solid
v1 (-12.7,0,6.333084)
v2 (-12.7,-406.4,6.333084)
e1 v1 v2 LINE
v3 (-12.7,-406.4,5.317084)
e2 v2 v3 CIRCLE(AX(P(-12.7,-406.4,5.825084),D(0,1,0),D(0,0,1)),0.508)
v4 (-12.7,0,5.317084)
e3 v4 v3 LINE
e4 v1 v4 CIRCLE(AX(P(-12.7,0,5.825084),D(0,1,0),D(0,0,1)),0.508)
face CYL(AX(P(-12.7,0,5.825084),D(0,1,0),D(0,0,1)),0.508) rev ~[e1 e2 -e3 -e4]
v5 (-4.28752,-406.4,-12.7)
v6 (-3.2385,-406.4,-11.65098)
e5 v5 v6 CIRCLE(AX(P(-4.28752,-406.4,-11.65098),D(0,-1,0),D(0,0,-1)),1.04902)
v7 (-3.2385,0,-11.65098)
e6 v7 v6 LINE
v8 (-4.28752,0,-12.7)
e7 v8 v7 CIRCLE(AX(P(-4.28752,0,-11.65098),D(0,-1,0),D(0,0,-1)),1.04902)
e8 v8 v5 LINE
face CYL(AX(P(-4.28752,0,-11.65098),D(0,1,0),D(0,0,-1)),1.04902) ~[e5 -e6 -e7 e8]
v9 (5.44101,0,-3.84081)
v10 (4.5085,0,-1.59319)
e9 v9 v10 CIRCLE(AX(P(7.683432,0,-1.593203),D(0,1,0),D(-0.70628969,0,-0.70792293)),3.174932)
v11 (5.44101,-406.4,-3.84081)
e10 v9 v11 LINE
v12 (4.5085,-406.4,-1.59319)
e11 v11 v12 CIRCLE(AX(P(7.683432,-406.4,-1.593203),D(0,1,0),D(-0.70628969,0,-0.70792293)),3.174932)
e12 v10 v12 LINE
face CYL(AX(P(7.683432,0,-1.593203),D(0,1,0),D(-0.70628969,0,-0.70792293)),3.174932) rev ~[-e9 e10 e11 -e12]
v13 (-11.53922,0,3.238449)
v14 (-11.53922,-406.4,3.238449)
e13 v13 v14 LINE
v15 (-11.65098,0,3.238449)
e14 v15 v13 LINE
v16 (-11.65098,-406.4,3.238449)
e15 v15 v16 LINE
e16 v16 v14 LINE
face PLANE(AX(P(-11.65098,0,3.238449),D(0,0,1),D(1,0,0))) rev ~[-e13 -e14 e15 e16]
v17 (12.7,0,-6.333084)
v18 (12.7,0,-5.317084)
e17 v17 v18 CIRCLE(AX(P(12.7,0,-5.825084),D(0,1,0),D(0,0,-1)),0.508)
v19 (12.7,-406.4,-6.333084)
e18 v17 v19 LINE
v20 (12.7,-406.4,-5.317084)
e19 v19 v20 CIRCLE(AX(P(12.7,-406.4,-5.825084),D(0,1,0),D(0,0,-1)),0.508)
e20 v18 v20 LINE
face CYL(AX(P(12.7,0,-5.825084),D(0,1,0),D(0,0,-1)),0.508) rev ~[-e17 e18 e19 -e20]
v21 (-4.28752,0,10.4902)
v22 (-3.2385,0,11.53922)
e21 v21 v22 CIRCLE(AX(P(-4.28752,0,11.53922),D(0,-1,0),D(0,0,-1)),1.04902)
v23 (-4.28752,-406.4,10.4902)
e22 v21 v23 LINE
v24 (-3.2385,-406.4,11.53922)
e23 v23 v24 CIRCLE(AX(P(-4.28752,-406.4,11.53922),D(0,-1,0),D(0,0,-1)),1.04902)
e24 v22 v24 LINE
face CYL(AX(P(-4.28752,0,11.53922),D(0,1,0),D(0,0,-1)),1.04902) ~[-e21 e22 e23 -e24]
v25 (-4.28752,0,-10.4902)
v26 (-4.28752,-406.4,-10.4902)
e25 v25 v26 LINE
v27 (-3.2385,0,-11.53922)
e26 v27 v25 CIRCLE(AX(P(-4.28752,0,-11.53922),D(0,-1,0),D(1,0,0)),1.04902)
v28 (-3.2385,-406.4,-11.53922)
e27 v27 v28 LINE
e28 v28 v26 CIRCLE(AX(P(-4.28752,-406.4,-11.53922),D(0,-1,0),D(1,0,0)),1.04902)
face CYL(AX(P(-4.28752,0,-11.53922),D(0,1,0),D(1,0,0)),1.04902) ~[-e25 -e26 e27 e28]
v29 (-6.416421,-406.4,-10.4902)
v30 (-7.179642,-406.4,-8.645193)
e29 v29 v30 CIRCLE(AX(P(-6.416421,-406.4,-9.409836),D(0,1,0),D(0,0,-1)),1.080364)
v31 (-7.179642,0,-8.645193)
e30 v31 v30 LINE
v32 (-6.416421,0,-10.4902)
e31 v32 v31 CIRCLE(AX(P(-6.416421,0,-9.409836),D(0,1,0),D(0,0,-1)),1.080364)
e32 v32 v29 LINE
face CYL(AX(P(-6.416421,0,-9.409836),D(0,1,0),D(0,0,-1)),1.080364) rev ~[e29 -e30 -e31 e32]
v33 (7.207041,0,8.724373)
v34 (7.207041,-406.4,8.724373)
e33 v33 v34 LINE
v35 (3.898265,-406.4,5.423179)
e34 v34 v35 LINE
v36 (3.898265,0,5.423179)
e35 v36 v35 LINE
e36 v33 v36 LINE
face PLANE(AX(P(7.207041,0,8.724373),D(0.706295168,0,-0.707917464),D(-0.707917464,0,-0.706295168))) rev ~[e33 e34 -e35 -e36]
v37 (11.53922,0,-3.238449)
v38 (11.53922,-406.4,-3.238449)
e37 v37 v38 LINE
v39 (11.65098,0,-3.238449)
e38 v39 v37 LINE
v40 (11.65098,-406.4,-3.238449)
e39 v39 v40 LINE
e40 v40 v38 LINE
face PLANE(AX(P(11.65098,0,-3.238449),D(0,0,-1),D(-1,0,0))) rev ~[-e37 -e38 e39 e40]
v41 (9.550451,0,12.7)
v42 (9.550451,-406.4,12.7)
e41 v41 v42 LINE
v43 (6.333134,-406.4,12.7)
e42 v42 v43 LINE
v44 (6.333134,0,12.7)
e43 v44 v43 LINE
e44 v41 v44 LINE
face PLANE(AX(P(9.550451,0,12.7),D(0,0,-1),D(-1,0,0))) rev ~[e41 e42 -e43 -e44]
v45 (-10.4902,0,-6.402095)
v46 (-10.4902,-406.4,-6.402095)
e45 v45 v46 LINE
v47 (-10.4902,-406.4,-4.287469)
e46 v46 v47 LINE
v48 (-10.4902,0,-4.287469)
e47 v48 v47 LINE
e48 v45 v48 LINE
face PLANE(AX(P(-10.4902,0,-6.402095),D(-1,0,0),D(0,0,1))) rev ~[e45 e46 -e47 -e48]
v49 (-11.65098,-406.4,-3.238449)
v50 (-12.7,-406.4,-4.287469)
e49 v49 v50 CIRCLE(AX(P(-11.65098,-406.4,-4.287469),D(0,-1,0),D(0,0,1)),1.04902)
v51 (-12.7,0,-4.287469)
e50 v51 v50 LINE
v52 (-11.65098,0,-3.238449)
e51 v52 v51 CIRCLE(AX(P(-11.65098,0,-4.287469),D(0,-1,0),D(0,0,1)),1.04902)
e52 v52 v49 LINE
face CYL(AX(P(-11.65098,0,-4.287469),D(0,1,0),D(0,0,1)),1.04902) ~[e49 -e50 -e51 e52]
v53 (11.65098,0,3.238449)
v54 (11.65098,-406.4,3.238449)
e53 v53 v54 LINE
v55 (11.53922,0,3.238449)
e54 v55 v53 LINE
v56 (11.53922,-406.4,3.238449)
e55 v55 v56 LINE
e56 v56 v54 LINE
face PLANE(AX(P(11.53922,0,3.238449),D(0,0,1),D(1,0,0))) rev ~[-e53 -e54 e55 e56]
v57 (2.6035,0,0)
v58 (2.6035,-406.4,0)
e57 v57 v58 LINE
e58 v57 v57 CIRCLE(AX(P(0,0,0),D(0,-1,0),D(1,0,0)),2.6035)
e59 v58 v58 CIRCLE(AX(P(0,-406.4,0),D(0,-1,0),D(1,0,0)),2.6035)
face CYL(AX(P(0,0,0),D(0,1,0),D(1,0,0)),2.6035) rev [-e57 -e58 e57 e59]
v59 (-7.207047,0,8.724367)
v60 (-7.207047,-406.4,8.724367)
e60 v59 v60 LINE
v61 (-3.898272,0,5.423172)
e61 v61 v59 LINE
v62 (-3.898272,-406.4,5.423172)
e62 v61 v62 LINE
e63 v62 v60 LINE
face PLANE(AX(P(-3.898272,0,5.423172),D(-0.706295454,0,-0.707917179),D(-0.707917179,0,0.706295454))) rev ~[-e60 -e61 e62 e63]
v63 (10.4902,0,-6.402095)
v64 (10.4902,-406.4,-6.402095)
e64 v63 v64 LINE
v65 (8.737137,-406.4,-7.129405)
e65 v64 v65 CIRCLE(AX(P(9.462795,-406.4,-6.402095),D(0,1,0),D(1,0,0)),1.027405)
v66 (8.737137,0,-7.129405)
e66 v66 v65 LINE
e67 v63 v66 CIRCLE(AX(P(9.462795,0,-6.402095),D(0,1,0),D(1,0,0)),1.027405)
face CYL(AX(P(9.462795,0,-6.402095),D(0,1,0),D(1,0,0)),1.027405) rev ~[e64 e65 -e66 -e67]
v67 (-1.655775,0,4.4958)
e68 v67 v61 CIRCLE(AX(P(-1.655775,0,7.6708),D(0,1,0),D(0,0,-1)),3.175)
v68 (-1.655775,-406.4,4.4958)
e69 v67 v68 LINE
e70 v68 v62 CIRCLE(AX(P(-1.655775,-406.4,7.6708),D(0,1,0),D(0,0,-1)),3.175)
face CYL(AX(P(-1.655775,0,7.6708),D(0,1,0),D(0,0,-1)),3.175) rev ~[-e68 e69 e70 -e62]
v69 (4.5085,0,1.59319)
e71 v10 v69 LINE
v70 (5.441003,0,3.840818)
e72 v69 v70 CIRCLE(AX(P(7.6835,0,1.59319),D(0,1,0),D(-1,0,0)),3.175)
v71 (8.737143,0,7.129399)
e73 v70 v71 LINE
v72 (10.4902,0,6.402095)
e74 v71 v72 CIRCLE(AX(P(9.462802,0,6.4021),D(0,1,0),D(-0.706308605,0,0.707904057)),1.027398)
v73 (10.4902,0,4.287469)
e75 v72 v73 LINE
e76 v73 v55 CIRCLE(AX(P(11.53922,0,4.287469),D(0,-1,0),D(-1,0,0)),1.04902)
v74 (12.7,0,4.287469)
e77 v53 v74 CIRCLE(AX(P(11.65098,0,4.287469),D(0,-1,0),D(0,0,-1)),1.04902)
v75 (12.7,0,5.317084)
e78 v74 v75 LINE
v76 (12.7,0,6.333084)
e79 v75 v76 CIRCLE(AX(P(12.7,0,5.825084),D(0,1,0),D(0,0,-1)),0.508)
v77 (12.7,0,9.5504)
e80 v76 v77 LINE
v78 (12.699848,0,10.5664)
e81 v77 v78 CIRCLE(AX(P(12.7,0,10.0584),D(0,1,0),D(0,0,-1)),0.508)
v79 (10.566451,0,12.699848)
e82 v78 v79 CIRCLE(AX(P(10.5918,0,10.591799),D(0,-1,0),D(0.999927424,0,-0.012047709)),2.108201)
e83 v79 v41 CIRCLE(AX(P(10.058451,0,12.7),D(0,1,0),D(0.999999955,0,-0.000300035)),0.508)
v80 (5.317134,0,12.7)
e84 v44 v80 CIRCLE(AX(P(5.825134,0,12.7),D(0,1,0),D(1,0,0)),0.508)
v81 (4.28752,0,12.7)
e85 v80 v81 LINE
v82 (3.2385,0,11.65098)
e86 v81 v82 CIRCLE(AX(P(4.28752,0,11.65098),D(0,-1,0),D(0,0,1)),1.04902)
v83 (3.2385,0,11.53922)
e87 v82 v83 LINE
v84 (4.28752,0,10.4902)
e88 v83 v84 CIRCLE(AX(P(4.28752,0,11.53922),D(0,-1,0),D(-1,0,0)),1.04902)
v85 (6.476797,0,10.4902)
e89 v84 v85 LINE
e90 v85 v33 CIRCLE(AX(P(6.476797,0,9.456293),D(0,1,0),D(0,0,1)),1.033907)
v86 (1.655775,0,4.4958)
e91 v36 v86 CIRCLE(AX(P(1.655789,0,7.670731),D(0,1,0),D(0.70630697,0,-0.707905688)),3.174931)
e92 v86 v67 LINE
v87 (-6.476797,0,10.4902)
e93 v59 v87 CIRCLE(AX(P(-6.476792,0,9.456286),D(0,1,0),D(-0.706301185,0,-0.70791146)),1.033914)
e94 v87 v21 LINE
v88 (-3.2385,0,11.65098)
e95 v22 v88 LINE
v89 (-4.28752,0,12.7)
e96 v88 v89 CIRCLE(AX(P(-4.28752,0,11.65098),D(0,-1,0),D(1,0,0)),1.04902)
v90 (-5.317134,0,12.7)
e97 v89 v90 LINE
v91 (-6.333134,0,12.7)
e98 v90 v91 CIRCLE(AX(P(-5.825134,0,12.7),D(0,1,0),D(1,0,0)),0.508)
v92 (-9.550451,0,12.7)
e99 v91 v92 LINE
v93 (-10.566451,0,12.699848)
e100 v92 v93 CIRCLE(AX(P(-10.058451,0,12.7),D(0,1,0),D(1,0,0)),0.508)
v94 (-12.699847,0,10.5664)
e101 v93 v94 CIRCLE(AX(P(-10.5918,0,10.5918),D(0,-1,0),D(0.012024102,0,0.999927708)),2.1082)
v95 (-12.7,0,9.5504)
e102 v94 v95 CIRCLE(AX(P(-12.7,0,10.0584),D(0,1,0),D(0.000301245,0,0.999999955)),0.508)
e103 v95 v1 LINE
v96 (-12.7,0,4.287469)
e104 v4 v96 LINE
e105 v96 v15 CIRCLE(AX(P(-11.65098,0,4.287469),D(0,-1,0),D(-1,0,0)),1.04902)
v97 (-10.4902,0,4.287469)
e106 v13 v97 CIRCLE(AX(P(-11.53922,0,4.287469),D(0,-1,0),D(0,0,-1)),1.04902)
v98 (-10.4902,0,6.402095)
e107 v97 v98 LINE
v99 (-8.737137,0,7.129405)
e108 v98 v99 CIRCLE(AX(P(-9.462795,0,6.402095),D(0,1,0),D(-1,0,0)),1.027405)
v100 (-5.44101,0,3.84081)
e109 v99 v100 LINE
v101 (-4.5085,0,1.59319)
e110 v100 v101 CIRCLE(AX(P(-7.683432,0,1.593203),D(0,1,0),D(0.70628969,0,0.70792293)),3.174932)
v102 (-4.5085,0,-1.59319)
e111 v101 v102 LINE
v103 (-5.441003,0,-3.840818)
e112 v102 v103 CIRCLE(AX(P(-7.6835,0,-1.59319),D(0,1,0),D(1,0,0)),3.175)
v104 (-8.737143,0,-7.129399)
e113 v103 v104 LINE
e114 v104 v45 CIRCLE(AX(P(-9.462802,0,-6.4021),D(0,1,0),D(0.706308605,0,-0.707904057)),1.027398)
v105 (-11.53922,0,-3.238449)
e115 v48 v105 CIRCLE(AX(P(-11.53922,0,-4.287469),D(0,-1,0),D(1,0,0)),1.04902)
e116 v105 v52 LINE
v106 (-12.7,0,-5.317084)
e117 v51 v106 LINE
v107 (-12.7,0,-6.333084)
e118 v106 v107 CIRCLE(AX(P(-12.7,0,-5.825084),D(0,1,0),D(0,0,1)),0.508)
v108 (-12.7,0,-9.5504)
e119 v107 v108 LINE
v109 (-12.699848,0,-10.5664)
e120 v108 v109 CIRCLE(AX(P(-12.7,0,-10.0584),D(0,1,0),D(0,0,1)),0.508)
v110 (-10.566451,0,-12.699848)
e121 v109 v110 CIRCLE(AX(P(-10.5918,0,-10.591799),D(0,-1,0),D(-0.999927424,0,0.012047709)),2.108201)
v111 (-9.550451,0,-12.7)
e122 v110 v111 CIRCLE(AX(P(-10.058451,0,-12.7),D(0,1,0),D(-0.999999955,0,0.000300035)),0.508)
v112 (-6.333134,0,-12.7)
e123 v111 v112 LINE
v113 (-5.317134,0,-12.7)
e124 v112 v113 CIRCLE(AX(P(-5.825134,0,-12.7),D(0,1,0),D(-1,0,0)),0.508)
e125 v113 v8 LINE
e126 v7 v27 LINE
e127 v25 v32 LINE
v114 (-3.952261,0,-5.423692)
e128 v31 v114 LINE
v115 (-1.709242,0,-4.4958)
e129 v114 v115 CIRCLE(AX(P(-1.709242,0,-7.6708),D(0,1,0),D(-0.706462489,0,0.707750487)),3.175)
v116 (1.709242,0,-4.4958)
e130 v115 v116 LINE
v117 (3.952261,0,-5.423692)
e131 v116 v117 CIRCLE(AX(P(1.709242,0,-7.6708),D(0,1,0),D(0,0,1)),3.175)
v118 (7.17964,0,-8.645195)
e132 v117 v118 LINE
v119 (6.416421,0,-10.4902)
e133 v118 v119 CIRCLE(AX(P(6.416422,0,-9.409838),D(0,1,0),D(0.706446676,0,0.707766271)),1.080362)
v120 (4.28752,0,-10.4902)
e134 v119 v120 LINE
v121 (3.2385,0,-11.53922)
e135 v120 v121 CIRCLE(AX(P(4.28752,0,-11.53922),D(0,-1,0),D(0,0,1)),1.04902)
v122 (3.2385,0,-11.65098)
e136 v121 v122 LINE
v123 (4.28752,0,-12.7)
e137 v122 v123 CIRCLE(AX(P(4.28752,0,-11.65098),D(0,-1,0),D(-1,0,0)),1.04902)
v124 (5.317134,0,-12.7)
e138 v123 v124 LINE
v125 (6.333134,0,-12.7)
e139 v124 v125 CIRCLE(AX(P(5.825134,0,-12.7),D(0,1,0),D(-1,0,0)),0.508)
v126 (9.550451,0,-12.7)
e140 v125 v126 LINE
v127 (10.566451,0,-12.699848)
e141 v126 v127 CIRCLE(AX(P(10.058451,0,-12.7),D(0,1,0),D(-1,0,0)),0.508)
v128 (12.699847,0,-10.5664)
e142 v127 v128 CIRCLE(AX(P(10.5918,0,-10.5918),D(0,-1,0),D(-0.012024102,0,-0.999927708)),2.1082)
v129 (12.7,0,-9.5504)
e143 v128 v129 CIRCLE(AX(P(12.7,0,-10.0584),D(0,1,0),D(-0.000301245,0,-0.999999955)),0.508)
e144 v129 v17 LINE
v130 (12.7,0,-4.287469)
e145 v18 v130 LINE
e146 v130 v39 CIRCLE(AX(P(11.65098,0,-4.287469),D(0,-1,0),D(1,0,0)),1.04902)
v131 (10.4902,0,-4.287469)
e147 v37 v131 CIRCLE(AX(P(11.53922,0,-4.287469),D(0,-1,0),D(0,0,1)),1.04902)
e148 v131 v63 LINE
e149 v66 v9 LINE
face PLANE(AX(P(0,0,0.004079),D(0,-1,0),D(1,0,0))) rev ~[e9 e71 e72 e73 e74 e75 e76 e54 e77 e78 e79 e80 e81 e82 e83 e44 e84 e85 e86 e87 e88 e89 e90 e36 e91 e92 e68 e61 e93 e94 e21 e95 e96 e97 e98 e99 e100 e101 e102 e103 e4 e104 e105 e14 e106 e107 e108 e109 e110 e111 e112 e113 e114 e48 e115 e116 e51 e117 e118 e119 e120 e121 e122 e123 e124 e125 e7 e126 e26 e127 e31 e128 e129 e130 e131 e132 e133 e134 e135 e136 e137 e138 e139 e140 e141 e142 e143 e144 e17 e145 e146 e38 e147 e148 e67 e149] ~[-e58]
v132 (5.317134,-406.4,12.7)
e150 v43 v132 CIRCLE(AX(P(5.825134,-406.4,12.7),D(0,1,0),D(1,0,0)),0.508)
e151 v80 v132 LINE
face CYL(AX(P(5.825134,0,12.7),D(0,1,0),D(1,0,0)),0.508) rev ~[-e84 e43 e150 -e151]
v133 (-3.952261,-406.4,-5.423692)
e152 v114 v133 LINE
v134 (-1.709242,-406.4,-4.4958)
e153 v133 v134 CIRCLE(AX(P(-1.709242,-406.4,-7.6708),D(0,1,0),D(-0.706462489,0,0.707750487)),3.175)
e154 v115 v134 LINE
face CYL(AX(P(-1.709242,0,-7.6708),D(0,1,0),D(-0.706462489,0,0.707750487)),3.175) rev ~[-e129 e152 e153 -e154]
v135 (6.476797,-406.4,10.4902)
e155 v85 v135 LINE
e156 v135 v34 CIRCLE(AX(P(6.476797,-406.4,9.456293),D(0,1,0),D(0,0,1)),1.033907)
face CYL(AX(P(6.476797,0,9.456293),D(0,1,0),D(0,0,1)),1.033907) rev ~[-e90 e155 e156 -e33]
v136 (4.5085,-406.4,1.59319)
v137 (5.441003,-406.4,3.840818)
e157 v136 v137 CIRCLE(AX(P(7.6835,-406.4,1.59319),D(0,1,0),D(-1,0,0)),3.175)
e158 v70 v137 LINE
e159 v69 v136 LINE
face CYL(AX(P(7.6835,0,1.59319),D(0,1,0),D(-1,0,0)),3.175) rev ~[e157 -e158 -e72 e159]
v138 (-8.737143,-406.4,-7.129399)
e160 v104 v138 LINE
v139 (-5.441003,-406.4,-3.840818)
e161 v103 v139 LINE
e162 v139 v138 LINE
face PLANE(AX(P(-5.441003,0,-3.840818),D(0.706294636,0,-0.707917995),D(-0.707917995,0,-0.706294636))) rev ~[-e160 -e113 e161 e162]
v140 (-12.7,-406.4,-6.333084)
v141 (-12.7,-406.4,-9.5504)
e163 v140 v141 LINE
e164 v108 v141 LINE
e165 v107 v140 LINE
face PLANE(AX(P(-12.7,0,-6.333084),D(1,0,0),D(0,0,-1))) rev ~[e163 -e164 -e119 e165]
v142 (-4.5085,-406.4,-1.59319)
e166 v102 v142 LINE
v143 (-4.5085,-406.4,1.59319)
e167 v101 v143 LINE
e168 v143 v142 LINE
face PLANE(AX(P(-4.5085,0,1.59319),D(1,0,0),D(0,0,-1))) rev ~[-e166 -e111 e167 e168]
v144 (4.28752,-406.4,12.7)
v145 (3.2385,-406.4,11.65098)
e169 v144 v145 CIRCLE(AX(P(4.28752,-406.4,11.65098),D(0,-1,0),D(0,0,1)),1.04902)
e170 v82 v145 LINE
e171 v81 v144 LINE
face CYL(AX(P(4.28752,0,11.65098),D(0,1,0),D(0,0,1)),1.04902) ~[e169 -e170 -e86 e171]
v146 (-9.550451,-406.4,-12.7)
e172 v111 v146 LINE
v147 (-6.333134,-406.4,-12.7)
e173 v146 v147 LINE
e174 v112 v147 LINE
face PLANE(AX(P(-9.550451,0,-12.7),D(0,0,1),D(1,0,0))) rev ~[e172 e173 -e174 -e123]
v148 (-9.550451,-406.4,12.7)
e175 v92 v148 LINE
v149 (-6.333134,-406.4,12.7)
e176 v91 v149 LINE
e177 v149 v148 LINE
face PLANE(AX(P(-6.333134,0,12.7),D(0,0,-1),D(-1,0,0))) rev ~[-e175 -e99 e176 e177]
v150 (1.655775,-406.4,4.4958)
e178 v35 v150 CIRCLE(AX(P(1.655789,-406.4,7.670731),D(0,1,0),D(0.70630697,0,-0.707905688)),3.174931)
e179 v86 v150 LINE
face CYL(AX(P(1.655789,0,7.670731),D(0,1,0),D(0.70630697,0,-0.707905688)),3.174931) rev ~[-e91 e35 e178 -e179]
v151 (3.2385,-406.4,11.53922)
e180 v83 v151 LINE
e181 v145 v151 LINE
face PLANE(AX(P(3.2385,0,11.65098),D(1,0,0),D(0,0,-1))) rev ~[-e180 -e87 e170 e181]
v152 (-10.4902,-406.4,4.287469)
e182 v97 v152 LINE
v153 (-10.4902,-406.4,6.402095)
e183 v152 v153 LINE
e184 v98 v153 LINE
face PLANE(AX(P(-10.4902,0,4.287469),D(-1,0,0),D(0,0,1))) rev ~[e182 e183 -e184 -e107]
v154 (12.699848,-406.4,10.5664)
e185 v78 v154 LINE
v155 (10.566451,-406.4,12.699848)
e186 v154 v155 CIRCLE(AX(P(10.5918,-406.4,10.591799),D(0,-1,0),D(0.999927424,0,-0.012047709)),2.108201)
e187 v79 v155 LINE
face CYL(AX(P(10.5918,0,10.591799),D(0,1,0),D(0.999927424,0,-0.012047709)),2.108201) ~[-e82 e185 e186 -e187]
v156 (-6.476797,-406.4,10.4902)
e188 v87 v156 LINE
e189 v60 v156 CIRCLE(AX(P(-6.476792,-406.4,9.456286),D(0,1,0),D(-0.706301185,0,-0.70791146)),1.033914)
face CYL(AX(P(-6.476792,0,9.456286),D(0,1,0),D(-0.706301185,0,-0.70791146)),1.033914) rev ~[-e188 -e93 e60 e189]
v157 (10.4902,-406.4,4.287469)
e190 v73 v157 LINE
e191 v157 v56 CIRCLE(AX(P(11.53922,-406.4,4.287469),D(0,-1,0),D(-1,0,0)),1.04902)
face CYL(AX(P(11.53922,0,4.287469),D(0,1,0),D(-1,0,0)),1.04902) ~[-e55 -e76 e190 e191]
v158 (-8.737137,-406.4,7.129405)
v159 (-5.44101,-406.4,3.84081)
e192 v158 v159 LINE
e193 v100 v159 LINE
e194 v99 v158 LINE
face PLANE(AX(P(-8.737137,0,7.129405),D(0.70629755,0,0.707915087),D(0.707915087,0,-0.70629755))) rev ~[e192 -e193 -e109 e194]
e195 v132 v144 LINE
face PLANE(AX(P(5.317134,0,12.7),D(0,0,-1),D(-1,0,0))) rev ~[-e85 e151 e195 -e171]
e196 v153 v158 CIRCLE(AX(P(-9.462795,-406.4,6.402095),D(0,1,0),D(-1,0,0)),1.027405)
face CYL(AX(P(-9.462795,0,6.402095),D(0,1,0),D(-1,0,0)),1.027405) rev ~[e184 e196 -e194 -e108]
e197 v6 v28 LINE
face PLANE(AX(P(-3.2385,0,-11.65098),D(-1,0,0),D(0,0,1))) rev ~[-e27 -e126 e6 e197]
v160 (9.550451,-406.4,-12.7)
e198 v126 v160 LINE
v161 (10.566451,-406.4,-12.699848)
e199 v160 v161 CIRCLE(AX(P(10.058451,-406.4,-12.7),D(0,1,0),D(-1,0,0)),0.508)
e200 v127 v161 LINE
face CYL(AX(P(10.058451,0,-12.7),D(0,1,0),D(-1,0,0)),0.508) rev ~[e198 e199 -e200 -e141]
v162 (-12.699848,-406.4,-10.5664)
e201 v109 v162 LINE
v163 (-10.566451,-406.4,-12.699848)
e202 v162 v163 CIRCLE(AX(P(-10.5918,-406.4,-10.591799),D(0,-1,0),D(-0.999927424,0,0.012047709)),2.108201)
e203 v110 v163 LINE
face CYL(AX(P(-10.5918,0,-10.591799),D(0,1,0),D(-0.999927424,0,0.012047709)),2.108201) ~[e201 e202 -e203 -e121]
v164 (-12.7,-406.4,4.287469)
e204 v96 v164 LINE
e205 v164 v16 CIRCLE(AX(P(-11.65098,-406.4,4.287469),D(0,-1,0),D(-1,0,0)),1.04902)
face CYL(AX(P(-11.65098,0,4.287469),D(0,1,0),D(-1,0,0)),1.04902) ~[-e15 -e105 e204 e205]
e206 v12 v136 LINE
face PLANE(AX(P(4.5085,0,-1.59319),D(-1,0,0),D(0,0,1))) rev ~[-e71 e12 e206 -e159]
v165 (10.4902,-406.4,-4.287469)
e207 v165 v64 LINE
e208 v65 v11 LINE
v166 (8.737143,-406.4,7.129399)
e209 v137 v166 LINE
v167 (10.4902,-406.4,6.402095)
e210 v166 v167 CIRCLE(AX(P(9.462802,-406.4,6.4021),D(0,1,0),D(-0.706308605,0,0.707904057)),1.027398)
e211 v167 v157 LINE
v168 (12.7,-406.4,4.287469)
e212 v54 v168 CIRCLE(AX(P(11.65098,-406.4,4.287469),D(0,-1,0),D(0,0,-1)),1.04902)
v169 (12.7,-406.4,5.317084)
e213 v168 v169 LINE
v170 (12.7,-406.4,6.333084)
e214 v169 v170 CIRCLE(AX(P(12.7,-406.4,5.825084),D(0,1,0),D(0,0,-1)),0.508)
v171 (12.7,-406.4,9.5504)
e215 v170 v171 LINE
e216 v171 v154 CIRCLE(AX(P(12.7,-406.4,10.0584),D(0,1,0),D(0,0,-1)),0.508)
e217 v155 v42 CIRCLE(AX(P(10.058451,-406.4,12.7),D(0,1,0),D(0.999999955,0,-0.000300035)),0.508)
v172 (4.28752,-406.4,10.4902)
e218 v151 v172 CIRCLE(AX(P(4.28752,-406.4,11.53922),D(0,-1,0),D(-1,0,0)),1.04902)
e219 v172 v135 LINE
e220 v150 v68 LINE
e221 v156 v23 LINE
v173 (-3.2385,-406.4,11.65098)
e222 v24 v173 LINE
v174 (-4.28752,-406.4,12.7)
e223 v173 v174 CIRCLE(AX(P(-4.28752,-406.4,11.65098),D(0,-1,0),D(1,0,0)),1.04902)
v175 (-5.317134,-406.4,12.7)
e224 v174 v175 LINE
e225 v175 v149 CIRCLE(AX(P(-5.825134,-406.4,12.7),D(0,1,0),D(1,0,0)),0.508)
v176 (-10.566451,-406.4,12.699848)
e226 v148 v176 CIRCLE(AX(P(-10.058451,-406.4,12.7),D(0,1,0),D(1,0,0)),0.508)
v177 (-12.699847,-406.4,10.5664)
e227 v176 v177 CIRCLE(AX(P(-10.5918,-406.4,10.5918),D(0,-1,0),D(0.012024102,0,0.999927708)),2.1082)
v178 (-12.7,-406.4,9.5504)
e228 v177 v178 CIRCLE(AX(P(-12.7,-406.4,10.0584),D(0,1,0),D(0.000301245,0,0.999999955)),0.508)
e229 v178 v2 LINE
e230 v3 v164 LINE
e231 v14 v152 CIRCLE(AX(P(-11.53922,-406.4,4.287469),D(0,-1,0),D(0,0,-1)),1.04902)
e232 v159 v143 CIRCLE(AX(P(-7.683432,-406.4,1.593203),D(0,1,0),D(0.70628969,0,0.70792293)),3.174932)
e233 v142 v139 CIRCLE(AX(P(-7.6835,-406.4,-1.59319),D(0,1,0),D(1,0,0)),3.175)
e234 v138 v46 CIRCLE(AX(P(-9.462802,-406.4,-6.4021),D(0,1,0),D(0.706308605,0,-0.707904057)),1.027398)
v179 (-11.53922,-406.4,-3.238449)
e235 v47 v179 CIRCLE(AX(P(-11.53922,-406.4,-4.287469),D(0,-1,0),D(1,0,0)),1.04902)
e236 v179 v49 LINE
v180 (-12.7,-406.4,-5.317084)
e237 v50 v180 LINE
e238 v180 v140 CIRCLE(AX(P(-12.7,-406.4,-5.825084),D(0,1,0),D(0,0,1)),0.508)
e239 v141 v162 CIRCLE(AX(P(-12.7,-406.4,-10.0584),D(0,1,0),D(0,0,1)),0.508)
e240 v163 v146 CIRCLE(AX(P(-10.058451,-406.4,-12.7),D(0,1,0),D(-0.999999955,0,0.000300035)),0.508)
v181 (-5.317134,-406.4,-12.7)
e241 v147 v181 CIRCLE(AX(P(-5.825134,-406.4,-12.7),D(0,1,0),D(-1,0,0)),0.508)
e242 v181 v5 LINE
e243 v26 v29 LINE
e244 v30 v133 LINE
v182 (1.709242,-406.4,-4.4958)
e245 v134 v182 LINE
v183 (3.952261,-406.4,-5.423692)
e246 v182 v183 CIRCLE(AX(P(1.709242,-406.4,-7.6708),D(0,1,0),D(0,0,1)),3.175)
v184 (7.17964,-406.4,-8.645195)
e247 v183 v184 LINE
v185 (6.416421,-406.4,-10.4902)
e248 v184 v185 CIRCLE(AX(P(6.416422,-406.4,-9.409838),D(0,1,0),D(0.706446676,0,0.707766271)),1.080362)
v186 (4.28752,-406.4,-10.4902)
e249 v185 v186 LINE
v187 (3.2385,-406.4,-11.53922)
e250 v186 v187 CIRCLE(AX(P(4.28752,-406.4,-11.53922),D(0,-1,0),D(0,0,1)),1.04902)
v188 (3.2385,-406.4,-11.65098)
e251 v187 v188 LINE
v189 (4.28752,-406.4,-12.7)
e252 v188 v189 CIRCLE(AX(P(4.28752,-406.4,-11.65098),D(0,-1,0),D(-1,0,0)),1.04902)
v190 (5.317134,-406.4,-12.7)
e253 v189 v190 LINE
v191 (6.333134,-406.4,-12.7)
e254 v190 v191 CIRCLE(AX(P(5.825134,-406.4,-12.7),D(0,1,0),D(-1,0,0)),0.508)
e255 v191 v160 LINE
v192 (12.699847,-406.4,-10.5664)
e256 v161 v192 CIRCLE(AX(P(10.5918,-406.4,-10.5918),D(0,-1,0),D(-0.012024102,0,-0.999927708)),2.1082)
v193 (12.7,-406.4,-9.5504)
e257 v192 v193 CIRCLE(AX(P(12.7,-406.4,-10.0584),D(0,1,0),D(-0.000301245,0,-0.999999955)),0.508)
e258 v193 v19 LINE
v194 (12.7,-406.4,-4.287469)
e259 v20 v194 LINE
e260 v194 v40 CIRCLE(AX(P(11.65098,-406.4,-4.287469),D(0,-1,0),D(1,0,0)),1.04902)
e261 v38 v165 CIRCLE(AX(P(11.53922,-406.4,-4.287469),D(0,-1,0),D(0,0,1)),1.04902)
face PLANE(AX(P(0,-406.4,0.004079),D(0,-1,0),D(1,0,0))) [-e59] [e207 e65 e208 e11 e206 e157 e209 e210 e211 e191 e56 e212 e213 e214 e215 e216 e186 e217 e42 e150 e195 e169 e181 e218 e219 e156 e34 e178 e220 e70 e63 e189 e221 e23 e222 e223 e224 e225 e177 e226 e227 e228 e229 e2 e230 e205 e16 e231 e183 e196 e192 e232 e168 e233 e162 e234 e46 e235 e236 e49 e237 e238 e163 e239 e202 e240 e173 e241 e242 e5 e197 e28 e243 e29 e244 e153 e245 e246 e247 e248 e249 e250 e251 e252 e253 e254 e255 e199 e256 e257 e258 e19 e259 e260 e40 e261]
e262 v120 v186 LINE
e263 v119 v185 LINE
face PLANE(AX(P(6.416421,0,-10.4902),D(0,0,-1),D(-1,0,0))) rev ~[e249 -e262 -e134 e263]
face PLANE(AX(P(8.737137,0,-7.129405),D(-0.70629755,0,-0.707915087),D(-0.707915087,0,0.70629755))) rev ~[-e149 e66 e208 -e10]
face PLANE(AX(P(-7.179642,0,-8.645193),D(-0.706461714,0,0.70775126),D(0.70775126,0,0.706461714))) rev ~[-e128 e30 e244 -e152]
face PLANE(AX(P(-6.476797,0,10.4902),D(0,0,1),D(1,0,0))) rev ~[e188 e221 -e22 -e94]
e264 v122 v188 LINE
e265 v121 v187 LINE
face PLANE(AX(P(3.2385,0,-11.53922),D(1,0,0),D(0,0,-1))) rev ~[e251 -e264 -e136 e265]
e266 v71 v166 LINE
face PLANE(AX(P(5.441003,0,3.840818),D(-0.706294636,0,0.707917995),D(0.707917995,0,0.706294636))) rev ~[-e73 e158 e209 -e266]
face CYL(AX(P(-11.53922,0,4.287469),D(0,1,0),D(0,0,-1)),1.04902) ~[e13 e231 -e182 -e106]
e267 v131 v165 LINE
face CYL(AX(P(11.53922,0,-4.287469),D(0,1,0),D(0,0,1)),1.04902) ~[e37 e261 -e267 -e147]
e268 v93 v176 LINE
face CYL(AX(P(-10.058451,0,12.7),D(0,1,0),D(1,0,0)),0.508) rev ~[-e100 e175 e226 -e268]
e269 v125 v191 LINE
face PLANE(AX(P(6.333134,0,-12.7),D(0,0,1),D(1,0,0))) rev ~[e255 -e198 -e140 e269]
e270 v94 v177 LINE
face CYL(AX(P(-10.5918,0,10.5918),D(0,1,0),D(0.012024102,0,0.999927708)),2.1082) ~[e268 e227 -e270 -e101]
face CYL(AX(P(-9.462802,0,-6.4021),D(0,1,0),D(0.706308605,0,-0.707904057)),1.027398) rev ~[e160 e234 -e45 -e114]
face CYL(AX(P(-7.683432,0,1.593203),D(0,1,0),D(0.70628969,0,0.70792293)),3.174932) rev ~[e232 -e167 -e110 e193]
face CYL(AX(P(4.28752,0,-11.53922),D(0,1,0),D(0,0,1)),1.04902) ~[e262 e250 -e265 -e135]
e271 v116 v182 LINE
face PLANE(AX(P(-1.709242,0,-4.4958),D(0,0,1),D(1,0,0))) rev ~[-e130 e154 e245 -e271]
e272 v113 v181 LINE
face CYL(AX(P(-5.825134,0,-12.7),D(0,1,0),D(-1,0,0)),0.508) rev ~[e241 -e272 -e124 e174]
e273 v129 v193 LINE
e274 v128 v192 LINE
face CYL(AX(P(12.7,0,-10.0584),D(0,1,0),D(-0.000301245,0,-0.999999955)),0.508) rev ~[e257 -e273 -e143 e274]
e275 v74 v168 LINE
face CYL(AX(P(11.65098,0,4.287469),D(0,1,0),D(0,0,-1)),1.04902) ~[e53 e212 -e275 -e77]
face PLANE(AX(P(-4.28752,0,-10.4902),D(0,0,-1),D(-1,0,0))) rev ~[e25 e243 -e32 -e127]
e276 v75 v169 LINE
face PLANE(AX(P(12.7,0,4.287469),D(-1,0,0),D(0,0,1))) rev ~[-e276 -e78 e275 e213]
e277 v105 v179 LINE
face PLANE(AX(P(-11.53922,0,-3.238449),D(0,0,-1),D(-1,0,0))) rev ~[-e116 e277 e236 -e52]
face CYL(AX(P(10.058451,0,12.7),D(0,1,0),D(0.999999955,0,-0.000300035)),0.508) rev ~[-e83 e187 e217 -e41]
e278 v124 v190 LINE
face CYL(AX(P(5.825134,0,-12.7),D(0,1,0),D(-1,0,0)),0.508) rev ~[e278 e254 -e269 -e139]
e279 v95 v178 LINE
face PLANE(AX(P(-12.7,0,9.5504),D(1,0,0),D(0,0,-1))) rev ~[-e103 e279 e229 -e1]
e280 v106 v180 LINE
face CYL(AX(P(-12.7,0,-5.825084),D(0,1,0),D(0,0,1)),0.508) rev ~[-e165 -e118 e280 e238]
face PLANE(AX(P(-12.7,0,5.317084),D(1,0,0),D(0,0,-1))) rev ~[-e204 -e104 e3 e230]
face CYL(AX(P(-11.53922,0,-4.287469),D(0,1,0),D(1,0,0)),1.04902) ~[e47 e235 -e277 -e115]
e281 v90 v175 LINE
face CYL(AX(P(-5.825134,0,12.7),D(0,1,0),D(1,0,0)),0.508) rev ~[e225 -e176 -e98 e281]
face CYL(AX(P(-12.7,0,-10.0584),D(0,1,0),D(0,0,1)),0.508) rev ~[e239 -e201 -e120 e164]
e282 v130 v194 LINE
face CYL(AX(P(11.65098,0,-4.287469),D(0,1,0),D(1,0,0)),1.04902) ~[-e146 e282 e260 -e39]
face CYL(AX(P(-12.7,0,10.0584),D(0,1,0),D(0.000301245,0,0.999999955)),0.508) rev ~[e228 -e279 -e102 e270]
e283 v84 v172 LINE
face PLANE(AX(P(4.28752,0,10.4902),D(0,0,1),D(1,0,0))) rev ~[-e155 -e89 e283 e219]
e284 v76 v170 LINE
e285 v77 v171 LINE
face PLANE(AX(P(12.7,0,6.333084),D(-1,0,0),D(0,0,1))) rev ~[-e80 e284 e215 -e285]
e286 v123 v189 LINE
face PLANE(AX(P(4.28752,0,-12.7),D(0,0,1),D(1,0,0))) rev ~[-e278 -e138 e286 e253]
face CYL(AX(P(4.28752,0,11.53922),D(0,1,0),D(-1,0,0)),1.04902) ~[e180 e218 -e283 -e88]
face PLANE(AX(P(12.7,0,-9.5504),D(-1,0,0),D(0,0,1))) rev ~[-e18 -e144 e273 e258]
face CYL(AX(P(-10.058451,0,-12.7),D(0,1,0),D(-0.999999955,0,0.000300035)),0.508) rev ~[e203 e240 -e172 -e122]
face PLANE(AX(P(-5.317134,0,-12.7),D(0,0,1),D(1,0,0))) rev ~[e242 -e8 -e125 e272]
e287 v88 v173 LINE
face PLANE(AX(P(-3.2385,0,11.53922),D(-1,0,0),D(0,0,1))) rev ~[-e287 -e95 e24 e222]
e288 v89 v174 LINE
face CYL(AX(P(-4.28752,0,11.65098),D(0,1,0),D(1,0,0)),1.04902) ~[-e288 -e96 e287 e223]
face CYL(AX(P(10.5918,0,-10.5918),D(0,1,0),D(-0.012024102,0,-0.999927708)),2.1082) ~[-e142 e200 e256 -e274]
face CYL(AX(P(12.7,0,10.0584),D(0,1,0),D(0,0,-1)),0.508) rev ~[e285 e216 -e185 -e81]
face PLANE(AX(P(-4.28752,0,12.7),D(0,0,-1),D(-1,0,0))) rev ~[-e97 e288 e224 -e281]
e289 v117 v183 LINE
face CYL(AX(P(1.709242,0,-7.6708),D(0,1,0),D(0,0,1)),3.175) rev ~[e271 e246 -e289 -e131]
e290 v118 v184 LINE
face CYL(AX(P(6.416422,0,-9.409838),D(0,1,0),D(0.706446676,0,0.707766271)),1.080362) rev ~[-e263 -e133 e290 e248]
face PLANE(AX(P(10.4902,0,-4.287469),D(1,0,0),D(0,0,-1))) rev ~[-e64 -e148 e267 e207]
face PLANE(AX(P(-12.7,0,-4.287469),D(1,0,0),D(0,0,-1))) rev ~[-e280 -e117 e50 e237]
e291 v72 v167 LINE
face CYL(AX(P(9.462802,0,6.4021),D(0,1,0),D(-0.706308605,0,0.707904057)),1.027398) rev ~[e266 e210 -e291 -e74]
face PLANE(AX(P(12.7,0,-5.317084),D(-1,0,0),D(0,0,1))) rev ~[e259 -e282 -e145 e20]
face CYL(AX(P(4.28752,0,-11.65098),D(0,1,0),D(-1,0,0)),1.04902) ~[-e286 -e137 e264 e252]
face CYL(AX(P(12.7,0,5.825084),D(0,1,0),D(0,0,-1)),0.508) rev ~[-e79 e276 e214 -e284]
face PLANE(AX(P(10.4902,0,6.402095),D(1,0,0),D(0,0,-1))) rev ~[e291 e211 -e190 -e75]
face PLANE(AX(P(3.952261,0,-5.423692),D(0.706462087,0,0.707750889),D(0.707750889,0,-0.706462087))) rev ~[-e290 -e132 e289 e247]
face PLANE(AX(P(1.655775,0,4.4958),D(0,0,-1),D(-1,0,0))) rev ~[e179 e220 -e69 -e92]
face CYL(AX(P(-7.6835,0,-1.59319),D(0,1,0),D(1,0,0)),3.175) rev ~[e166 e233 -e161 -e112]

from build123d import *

# Parameters (mm, degrees)
F0_R     = 2.6035
F1_DEPTH = 406.4


# Not quite as in the source:
# - ends of sketch curves that miss each other by under 0.0002 mm in the source are joined


with BuildPart() as f1:
    # F0 (on Front) → F1 (new body)
    with BuildSketch(Plane.XZ):
        with BuildLine():
            ThreePointArc((-3.9522606035, -5.4236922052), (-2.9229262099, -4.7369294977), (-1.7092422, -4.4958))
            Line((-1.7092422, -4.4958), (1.7092422, -4.4958))
            ThreePointArc((1.7092422, -4.4958), (2.9229262099, -4.7369294977), (3.9522606035, -5.4236922052))
            Line((3.9522606035, -5.4236922052), (7.1796402, -8.6451948))
            ThreePointArc((7.1796402, -8.6451948), (7.4147391594, -9.822808991), (6.416421, -10.4902))
            Line((6.416421, -10.4902), (4.28752, -10.4902))
            ThreePointArc((4.28752, -10.4902), (3.5457508444, -10.7974508444), (3.2385, -11.53922))
            Line((3.2385, -11.53922), (3.2385, -11.65098))
            ThreePointArc((3.2385, -11.65098), (3.5457508444, -12.3927491556), (4.28752, -12.7))
            Line((4.28752, -12.7), (5.3171344, -12.7))
            ThreePointArc((5.3171344, -12.7), (5.8251344, -12.192), (6.3331344, -12.7))
            Line((6.3331344, -12.7), (9.5504508, -12.7))
            ThreePointArc((9.5504508, -12.7), (10.0583746, -12.1920000057), (10.5664507771, -12.6998476))
            ThreePointArc((10.5664507771, -12.6998476), (12.0825404752, -12.0825045568), (12.6998469825, -10.5664000074))
            ThreePointArc((12.6998469825, -10.5664000074), (12.1920000057, -10.0583238), (12.7, -9.5504))
            Line((12.7, -9.5504), (12.7, -6.3330836))
            ThreePointArc((12.7, -6.3330836), (12.192, -5.8250836), (12.7, -5.3170836))
            Line((12.7, -5.3170836), (12.7, -4.2874692))
            ThreePointArc((12.7, -4.2874692), (12.3927491556, -3.5457000444), (11.65098, -3.2384492))
            Line((11.65098, -3.2384492), (11.53922, -3.2384492))
            ThreePointArc((11.53922, -3.2384492), (10.7974508444, -3.5457000444), (10.4902, -4.2874692))
            Line((10.4902, -4.2874692), (10.4902, -6.4020954))
            ThreePointArc((10.4902, -6.4020954), (9.8565053438, -7.3510699477), (8.7371366164, -7.1294051977))
            Line((8.7371366164, -7.1294051977), (5.4410102, -3.8408102))
            ThreePointArc((5.4410102, -3.8408102), (4.7508771577, -2.8098852335), (4.5085, -1.5931896))
            Line((4.5085, -1.5931896), (4.5085, 1.5931896))
            ThreePointArc((4.5085, 1.5931896), (4.7508771577, 2.8098852335), (5.4410028439, 3.840817573))
            Line((5.4410028439, 3.840817573), (8.7371428, 7.129399))
            ThreePointArc((8.7371428, 7.129399), (9.8565053438, 7.3510699477), (10.4902, 6.4020954))
            Line((10.4902, 6.4020954), (10.4902, 4.2874692))
            ThreePointArc((10.4902, 4.2874692), (10.7974508444, 3.5457000444), (11.53922, 3.2384492))
            Line((11.53922, 3.2384492), (11.65098, 3.2384492))
            ThreePointArc((11.65098, 3.2384492), (12.3927491556, 3.5457000444), (12.7, 4.2874692))
            Line((12.7, 4.2874692), (12.7, 5.3170836))
            ThreePointArc((12.7, 5.3170836), (12.192, 5.8250836), (12.7, 6.3330836))
            Line((12.7, 6.3330836), (12.7, 9.5504))
            ThreePointArc((12.7, 9.5504), (12.1920000057, 10.0583238), (12.6998476, 10.5663999771))
            ThreePointArc((12.6998476, 10.5663999771), (12.0825404752, 12.0825045568), (10.5664508001, 12.6998475939))
            ThreePointArc((10.5664508001, 12.6998475939), (10.0583746, 12.1920000057), (9.5504508, 12.7))
            Line((9.5504508, 12.7), (6.3331344, 12.7))
            ThreePointArc((6.3331344, 12.7), (5.8251344, 12.192), (5.3171344, 12.7))
            Line((5.3171344, 12.7), (4.28752, 12.7))
            ThreePointArc((4.28752, 12.7), (3.5457508444, 12.3927491556), (3.2385, 11.65098))
            Line((3.2385, 11.65098), (3.2385, 11.53922))
            ThreePointArc((3.2385, 11.53922), (3.5457508444, 10.7974508444), (4.28752, 10.4902))
            Line((4.28752, 10.4902), (6.4767968, 10.4902))
            ThreePointArc((6.4767968, 10.4902), (7.4322289723, 9.8514044384), (7.2070407772, 8.7243726366))
            Line((7.2070407772, 8.7243726366), (3.898265, 5.4231794))
            ThreePointArc((3.898265, 5.4231794), (2.8691189654, 4.7367887684), (1.6557752, 4.4958))
            Line((1.6557752, 4.4958), (-1.6557752, 4.4958))
            ThreePointArc((-1.6557752, 4.4958), (-2.8691189654, 4.7367887684), (-3.8982723561, 5.423172027))
            Line((-3.8982723561, 5.423172027), (-7.2070468, 8.7243666))
            ThreePointArc((-7.2070468, 8.7243666), (-7.4322289723, 9.8514044384), (-6.4767968, 10.4902))
            Line((-6.4767968, 10.4902), (-4.28752, 10.4902))
            ThreePointArc((-4.28752, 10.4902), (-3.5457508444, 10.7974508444), (-3.2385, 11.53922))
            Line((-3.2385, 11.53922), (-3.2385, 11.65098))
            ThreePointArc((-3.2385, 11.65098), (-3.5457508444, 12.3927491556), (-4.28752, 12.7))
            Line((-4.28752, 12.7), (-5.3171344, 12.7))
            ThreePointArc((-5.3171344, 12.7), (-5.8251344, 12.192), (-6.3331344, 12.7))
            Line((-6.3331344, 12.7), (-9.5504508, 12.7))
            ThreePointArc((-9.5504508, 12.7), (-10.0583746, 12.1920000057), (-10.5664507771, 12.6998476))
            ThreePointArc((-10.5664507771, 12.6998476), (-12.0825404752, 12.0825045568), (-12.6998469825, 10.5664000074))
            ThreePointArc((-12.6998469825, 10.5664000074), (-12.1920000057, 10.0583238), (-12.7, 9.5504))
            Line((-12.7, 9.5504), (-12.7, 6.3330836))
            ThreePointArc((-12.7, 6.3330836), (-12.192, 5.8250836), (-12.7, 5.3170836))
            Line((-12.7, 5.3170836), (-12.7, 4.2874692))
            ThreePointArc((-12.7, 4.2874692), (-12.3927491556, 3.5457000444), (-11.65098, 3.2384492))
            Line((-11.65098, 3.2384492), (-11.53922, 3.2384492))
            ThreePointArc((-11.53922, 3.2384492), (-10.7974508444, 3.5457000444), (-10.4902, 4.2874692))
            Line((-10.4902, 4.2874692), (-10.4902, 6.4020954))
            ThreePointArc((-10.4902, 6.4020954), (-9.8565053438, 7.3510699477), (-8.7371366164, 7.1294051977))
            Line((-8.7371366164, 7.1294051977), (-5.4410102, 3.8408102))
            ThreePointArc((-5.4410102, 3.8408102), (-4.7508771577, 2.8098852335), (-4.5085, 1.5931896))
            Line((-4.5085, 1.5931896), (-4.5085, -1.5931896))
            ThreePointArc((-4.5085, -1.5931896), (-4.7508771577, -2.8098852335), (-5.4410028439, -3.840817573))
            Line((-5.4410028439, -3.840817573), (-8.7371428, -7.129399))
            ThreePointArc((-8.7371428, -7.129399), (-9.8565053438, -7.3510699477), (-10.4902, -6.4020954))
            Line((-10.4902, -6.4020954), (-10.4902, -4.2874692))
            ThreePointArc((-10.4902, -4.2874692), (-10.7974508444, -3.5457000444), (-11.53922, -3.2384492))
            Line((-11.53922, -3.2384492), (-11.65098, -3.2384492))
            ThreePointArc((-11.65098, -3.2384492), (-12.3927491556, -3.5457000444), (-12.7, -4.2874692))
            Line((-12.7, -4.2874692), (-12.7, -5.3170836))
            ThreePointArc((-12.7, -5.3170836), (-12.192, -5.8250836), (-12.7, -6.3330836))
            Line((-12.7, -6.3330836), (-12.7, -9.5504))
            ThreePointArc((-12.7, -9.5504), (-12.1920000057, -10.0583238), (-12.6998476, -10.5663999771))
            ThreePointArc((-12.6998476, -10.5663999771), (-12.0825404752, -12.0825045568), (-10.5664508001, -12.6998475939))
            ThreePointArc((-10.5664508001, -12.6998475939), (-10.0583746, -12.1920000057), (-9.5504508, -12.7))
            Line((-9.5504508, -12.7), (-6.3331344, -12.7))
            ThreePointArc((-6.3331344, -12.7), (-5.8251344, -12.192), (-5.3171344, -12.7))
            Line((-5.3171344, -12.7), (-4.28752, -12.7))
            ThreePointArc((-4.28752, -12.7), (-3.5457508444, -12.3927491556), (-3.2385, -11.65098))
            Line((-3.2385, -11.65098), (-3.2385, -11.53922))
            ThreePointArc((-3.2385, -11.53922), (-3.5457508444, -10.7974508444), (-4.28752, -10.4902))
            Line((-4.28752, -10.4902), (-6.416421, -10.4902))
            ThreePointArc((-6.416421, -10.4902), (-7.4147391594, -9.822808991), (-7.1796418951, -8.6451931018))
            Line((-7.1796418951, -8.6451931018), (-3.9522606035, -5.4236922052))
        make_face()
        Circle(F0_R, mode=Mode.SUBTRACT)
    extrude(amount=F1_DEPTH)


solid = f1.part
